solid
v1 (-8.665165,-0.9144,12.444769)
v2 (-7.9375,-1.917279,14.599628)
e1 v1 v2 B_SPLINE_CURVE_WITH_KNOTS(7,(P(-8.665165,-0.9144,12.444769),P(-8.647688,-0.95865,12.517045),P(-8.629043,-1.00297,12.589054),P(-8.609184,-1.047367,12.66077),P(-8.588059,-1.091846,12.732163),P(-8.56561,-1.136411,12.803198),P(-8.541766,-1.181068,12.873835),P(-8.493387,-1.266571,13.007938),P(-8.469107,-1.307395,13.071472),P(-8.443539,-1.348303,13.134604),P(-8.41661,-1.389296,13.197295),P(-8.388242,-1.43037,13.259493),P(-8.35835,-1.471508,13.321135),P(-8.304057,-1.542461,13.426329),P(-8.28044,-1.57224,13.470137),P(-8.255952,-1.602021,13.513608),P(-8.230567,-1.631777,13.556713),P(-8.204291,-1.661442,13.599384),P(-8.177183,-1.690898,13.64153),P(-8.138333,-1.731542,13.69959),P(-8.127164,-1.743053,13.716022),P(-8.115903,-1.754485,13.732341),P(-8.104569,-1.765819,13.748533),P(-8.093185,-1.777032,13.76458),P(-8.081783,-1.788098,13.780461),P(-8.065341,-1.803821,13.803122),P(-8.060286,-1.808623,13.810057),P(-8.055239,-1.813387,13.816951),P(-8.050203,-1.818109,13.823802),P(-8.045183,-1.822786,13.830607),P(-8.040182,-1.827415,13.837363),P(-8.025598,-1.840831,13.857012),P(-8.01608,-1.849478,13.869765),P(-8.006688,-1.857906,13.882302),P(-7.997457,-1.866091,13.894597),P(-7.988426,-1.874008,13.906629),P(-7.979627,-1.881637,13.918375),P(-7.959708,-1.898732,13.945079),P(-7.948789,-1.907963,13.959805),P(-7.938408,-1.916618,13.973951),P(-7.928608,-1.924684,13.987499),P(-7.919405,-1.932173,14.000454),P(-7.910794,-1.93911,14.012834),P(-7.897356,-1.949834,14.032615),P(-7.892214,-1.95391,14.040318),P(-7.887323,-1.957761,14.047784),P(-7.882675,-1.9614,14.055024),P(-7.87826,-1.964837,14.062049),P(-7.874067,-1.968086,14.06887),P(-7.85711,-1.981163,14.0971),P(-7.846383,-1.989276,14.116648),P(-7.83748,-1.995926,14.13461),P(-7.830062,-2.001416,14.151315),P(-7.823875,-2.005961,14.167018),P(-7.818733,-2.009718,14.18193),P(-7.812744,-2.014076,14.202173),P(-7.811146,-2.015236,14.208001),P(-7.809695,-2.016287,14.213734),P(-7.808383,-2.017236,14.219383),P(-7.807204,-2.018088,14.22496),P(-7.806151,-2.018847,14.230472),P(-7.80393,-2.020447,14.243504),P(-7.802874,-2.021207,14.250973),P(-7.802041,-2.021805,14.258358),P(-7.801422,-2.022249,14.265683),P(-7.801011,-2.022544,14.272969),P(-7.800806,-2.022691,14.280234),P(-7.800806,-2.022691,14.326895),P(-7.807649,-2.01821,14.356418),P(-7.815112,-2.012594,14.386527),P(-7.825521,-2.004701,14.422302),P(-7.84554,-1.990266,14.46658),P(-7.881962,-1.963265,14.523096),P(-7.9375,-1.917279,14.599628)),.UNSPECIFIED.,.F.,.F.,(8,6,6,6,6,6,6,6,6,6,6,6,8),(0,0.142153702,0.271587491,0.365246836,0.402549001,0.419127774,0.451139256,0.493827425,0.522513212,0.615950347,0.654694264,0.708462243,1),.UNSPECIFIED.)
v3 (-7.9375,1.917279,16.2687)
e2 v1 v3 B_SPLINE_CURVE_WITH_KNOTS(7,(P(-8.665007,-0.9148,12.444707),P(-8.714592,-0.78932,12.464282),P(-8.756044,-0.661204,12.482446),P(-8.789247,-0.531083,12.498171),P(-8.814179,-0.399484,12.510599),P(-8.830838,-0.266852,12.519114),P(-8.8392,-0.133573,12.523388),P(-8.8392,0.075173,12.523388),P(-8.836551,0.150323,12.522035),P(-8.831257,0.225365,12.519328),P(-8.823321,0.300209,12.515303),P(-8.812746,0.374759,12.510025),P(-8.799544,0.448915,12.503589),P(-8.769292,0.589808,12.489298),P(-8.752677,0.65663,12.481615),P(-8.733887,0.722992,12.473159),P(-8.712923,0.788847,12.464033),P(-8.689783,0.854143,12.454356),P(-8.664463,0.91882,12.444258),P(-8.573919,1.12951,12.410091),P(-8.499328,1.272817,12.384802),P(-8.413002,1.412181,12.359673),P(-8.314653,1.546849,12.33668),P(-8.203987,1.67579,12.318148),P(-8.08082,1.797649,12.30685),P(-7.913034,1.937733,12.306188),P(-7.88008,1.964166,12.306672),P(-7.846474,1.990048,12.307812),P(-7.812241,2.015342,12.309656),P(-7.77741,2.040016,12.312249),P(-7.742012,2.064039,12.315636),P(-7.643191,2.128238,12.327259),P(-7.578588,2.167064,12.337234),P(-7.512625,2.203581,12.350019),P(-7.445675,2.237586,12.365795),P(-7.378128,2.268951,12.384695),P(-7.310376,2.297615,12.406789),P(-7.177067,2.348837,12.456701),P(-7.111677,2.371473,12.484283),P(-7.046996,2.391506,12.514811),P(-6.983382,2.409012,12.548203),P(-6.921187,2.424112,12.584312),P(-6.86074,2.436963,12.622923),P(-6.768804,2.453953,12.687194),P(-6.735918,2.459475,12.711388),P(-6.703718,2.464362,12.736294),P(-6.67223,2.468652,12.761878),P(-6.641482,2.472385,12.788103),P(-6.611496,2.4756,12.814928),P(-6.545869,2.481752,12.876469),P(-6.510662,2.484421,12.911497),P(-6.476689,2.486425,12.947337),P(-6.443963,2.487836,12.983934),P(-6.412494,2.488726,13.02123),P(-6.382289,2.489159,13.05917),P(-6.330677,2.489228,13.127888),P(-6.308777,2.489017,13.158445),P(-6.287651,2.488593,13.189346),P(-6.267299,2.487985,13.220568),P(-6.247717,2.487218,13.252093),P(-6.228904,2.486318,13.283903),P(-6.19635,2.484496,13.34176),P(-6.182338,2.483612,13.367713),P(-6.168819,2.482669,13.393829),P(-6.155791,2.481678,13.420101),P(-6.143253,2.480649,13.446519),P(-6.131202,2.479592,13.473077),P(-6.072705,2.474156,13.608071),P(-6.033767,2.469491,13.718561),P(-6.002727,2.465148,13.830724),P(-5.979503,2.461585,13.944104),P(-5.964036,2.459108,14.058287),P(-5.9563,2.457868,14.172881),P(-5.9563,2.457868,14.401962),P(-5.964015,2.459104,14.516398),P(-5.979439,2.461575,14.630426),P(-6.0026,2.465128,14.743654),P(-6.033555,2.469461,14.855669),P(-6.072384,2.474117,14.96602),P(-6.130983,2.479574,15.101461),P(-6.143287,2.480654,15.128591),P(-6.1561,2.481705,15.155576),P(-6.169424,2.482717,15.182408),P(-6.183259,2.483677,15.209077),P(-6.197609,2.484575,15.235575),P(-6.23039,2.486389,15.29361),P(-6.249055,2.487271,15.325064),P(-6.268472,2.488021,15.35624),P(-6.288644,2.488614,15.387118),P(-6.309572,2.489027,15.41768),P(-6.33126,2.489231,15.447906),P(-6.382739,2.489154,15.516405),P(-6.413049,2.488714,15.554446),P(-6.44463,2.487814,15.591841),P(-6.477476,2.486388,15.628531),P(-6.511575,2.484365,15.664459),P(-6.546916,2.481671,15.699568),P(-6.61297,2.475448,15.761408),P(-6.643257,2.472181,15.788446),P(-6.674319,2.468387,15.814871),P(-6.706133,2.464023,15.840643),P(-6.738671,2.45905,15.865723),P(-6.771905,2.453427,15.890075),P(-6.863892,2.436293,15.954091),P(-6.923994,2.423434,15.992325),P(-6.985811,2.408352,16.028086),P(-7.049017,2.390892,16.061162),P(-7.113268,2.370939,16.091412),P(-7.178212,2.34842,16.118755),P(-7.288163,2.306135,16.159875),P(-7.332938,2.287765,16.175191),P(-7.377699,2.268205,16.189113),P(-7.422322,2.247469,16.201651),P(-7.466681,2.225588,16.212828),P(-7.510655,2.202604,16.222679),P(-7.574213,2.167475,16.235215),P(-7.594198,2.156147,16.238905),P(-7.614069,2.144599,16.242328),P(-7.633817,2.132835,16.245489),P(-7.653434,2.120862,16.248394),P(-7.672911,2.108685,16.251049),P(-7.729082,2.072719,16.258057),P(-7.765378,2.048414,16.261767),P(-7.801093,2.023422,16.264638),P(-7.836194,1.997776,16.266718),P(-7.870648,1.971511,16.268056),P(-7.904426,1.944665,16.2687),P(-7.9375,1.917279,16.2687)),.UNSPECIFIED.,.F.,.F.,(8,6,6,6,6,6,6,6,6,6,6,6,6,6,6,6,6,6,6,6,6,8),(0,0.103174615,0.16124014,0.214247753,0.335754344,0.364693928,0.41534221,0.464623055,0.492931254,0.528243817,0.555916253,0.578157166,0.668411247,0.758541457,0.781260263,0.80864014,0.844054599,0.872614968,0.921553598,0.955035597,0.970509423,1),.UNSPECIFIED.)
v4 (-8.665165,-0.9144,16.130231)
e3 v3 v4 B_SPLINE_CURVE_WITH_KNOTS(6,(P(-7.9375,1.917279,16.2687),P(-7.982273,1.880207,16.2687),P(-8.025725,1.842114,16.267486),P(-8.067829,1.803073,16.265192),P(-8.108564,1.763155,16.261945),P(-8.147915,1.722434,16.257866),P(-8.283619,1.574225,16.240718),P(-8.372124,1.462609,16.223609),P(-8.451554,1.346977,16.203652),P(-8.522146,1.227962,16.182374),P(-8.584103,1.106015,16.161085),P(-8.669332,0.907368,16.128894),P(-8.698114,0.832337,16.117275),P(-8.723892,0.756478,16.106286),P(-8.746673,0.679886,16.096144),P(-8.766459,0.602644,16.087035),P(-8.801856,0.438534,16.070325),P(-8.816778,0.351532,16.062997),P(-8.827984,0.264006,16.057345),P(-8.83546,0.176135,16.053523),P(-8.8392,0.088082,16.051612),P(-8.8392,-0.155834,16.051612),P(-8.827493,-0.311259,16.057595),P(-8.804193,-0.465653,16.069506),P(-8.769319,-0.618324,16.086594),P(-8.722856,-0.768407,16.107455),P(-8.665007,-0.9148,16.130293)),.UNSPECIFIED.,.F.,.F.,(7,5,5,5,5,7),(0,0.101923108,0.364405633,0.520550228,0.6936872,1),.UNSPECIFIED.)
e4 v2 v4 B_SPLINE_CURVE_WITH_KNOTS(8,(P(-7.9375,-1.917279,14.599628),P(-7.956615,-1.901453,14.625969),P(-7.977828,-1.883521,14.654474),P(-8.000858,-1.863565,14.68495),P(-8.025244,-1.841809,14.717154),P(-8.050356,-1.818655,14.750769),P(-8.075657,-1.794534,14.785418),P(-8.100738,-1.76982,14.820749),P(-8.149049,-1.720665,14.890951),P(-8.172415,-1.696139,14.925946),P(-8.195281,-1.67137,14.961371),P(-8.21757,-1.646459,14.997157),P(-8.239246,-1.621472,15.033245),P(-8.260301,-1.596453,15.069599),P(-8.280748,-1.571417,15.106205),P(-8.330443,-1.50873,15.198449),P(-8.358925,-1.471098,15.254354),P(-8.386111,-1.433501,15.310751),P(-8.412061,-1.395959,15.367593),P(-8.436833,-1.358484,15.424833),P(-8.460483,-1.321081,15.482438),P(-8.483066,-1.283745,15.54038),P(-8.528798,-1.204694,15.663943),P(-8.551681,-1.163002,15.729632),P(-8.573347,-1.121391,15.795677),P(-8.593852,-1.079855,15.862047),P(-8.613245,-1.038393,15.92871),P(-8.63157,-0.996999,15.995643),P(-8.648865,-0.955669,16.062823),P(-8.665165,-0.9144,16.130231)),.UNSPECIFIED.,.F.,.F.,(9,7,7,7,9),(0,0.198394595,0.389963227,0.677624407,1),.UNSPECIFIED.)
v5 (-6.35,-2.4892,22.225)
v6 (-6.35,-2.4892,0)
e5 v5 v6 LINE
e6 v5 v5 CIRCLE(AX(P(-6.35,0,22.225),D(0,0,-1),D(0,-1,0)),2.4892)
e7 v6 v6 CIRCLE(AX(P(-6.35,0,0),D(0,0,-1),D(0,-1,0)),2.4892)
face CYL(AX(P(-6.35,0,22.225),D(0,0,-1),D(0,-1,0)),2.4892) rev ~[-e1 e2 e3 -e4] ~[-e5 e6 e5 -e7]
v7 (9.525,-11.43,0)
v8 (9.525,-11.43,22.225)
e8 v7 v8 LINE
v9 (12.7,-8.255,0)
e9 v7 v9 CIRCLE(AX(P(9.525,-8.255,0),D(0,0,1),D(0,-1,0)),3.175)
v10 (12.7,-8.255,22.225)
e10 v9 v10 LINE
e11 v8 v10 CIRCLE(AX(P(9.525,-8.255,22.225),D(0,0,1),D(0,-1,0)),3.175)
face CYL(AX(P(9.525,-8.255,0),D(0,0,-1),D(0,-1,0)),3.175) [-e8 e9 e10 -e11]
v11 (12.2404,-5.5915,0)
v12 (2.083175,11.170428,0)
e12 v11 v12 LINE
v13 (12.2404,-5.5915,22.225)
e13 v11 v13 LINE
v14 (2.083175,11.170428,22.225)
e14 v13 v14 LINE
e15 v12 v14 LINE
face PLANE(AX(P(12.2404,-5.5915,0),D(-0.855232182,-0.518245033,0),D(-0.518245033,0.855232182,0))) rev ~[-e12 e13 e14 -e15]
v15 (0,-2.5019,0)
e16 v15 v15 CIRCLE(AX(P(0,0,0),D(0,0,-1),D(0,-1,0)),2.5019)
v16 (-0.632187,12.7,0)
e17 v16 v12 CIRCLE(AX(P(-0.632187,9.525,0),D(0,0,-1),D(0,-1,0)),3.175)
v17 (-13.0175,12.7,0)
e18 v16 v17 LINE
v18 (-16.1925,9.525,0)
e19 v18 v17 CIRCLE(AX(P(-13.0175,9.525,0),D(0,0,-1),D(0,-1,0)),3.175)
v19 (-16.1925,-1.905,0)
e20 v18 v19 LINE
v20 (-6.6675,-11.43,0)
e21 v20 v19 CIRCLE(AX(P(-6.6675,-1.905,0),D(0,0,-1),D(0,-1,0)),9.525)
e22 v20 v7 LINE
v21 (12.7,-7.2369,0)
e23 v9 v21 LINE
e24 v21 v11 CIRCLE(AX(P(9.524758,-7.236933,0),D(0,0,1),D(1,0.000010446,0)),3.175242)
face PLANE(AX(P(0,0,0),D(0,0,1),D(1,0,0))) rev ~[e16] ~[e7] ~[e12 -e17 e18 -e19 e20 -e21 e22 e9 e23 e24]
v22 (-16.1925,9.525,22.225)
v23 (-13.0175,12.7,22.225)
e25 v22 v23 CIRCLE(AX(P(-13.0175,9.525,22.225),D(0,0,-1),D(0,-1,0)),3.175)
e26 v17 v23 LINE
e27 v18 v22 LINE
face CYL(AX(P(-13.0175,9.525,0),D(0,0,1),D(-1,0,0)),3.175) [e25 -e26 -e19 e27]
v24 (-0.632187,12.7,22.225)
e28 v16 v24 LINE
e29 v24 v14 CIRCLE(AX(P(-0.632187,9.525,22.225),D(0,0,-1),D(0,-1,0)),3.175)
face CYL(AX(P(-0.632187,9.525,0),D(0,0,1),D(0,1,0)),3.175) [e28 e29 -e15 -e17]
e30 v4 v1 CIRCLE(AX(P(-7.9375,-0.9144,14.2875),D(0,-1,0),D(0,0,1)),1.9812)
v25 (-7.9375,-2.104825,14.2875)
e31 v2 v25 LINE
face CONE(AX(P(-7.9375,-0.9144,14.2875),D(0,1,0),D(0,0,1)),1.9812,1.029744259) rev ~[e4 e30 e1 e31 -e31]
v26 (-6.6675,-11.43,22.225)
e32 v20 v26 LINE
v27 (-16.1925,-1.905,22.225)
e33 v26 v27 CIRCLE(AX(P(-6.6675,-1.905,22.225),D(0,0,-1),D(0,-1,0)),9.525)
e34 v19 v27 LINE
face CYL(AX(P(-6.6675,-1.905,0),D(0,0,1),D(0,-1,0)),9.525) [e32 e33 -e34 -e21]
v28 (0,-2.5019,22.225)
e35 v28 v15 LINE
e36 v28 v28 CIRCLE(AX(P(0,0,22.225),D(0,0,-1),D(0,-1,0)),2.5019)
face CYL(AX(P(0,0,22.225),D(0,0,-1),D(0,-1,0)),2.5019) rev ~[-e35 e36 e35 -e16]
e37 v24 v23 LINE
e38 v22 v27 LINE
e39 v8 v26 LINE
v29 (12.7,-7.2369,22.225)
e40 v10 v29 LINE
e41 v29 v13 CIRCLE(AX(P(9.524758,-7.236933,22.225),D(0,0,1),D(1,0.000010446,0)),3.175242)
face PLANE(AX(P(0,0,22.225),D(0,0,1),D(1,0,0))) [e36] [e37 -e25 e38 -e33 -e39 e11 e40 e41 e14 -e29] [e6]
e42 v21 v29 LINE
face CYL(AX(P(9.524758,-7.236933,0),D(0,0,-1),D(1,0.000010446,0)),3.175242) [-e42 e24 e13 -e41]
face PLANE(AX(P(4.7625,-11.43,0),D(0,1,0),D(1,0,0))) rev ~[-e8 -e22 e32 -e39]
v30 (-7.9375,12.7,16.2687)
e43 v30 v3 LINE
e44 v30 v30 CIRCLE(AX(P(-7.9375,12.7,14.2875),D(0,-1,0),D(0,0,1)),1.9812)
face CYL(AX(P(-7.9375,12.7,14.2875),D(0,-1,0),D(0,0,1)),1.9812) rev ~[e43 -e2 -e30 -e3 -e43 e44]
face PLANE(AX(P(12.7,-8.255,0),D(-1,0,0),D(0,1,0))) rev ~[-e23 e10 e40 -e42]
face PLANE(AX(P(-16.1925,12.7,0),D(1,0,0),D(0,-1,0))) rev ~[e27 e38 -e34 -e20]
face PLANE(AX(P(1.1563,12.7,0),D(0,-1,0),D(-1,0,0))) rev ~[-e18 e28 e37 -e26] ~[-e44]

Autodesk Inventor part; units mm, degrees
ref_plane "YZ Plane" through (0, 0, 0) normal (1, 0, 0) x (0, 1, 0)
ref_plane "XZ Plane" through (0, 0, 0) normal (0, 1, 0) x (-1, 0, 0)
ref_plane "XY Plane" through (0, 0, 0) normal (0, 0, 1) x (1, 0, 0)
sketch "Sketch1" plane through (0, 0, 0) normal (0, 0, 1) x (1, 0, 0)
  arc A0 (5.1615, 6.0904) -> (2.4461, 7.62) centre (2.4461, 4.445) ccw construction
  line L0 (2.4461, 7.62) -> (-28.575, 7.62) construction
  arc A1 (-28.575, 7.62) -> (-31.75, 4.445) centre (-28.575, 4.445) ccw construction
  line L1 (-31.75, 4.445) -> (-31.75, -0.344) construction
  arc A2 (-31.75, -0.344) -> (-31.6418, -1.1658) centre (-28.575, -0.344) ccw construction
  line L2 (-29.5221, -9.0768) -> (-31.6418, -1.1658) construction
  arc A3 (-29.5221, -9.0768) -> (-26.4553, -11.43) centre (-26.4553, -8.255) ccw construction
  line L3 (-26.4553, -11.43) -> (9.525, -11.43) construction
  arc A4 (9.525, -11.43) -> (12.7, -8.255) centre (9.525, -8.255) ccw
  line L4 (12.7, -8.255) -> (12.7, -7.2369)
  arc A5 (12.7, -7.2369) -> (12.2404, -5.5915) centre (9.525, -7.2369) ccw
  line L5 (5.1615, 6.0904) -> (12.2404, -5.5915) construction
  line L6 (4.7625, 12.7) -> (-16.1925, 12.7)
  line L7 (-16.1925, 12.7) -> (-16.1925, -11.43)
  line L8 (-16.1925, -11.43) -> (4.7625, -11.43)
  line L9 (4.7625, -11.43) -> (4.7625, 12.7) construction
  line L10 (4.7625, -11.43) -> (9.525, -11.43)
  line L11 (12.2404, -5.5915) -> (1.1563, 12.7)
  point P0 (0, 0)
  dimension "d0" = 20.955
  dimension "d1" = 24.13
  dimension "d2" = 4.7625
extrude "Extrusion1" add sketch "Sketch1" along normal blind 22.225
sketch "Sketch2" plane through (0, 0, 22.225) normal (0, 0, 1) x (1, 0, 0)
  circle A0 centre (0, 0) radius 2.5019 construction
  circle A1 centre (-6.35, 0) radius 2.5527 construction
  circle A2 centre (-19.05, 0) radius 2.5527 construction
  circle A3 centre (-25.4, 0) radius 2.5019 construction
  point P0 (0, 0)
hole "Hole1" at (0, 0, 22.225) direction (0, 0, -1) diameter 5.0038 end through all clearance for "H7 - STANDARD FIT" size "5" standard "CL-DOWEL-MET"
hole "Hole2" at (-6.35, 0, 22.225) at (-19.05, 0, 22.225) direction (0, 0, -1) diameter 4.9784 end through all clearance for "Flat Head Machine Screw (82)" size "#10" standard "Ansi Unified Screw Threads"
sketch "Sketch3" plane through (-16.1925, 12.7, 0) normal (0, 1, 0) x (1, 0, 0)
  line L0 (16.1925, -14.2875) -> (8.255, -14.2875) construction
  line L1 (-46.1199, -6.35) -> (861.9301, -6.35) construction
  line L2 (0, 0) -> (0, -22.225) construction
  point P0 (16.1925, 0)
  dimension "d19" = 7.9375
  dimension "d21" = 7.9375
  dimension "d31" = 8.255
hole "Hole3" at (-7.9375, 12.7, 14.2875) direction (0, -1, 0) diameter 3.9624 depth 13.6144 tip angle 118 thread size "10-32 UNF" class "2B" standard "ANSI Unified Screw Threads"
fillet "Fillet1" radius 9.525 1 edges at (-16.1925, -11.43, 11.1125)
fillet "Fillet2" radius 3.175 2 edges at (-16.1925, 12.7, 11.1125) (1.1563, 12.7, 11.1125)
properties part number "BEARING,MOUNT,SIDE,ELEVATOR"
